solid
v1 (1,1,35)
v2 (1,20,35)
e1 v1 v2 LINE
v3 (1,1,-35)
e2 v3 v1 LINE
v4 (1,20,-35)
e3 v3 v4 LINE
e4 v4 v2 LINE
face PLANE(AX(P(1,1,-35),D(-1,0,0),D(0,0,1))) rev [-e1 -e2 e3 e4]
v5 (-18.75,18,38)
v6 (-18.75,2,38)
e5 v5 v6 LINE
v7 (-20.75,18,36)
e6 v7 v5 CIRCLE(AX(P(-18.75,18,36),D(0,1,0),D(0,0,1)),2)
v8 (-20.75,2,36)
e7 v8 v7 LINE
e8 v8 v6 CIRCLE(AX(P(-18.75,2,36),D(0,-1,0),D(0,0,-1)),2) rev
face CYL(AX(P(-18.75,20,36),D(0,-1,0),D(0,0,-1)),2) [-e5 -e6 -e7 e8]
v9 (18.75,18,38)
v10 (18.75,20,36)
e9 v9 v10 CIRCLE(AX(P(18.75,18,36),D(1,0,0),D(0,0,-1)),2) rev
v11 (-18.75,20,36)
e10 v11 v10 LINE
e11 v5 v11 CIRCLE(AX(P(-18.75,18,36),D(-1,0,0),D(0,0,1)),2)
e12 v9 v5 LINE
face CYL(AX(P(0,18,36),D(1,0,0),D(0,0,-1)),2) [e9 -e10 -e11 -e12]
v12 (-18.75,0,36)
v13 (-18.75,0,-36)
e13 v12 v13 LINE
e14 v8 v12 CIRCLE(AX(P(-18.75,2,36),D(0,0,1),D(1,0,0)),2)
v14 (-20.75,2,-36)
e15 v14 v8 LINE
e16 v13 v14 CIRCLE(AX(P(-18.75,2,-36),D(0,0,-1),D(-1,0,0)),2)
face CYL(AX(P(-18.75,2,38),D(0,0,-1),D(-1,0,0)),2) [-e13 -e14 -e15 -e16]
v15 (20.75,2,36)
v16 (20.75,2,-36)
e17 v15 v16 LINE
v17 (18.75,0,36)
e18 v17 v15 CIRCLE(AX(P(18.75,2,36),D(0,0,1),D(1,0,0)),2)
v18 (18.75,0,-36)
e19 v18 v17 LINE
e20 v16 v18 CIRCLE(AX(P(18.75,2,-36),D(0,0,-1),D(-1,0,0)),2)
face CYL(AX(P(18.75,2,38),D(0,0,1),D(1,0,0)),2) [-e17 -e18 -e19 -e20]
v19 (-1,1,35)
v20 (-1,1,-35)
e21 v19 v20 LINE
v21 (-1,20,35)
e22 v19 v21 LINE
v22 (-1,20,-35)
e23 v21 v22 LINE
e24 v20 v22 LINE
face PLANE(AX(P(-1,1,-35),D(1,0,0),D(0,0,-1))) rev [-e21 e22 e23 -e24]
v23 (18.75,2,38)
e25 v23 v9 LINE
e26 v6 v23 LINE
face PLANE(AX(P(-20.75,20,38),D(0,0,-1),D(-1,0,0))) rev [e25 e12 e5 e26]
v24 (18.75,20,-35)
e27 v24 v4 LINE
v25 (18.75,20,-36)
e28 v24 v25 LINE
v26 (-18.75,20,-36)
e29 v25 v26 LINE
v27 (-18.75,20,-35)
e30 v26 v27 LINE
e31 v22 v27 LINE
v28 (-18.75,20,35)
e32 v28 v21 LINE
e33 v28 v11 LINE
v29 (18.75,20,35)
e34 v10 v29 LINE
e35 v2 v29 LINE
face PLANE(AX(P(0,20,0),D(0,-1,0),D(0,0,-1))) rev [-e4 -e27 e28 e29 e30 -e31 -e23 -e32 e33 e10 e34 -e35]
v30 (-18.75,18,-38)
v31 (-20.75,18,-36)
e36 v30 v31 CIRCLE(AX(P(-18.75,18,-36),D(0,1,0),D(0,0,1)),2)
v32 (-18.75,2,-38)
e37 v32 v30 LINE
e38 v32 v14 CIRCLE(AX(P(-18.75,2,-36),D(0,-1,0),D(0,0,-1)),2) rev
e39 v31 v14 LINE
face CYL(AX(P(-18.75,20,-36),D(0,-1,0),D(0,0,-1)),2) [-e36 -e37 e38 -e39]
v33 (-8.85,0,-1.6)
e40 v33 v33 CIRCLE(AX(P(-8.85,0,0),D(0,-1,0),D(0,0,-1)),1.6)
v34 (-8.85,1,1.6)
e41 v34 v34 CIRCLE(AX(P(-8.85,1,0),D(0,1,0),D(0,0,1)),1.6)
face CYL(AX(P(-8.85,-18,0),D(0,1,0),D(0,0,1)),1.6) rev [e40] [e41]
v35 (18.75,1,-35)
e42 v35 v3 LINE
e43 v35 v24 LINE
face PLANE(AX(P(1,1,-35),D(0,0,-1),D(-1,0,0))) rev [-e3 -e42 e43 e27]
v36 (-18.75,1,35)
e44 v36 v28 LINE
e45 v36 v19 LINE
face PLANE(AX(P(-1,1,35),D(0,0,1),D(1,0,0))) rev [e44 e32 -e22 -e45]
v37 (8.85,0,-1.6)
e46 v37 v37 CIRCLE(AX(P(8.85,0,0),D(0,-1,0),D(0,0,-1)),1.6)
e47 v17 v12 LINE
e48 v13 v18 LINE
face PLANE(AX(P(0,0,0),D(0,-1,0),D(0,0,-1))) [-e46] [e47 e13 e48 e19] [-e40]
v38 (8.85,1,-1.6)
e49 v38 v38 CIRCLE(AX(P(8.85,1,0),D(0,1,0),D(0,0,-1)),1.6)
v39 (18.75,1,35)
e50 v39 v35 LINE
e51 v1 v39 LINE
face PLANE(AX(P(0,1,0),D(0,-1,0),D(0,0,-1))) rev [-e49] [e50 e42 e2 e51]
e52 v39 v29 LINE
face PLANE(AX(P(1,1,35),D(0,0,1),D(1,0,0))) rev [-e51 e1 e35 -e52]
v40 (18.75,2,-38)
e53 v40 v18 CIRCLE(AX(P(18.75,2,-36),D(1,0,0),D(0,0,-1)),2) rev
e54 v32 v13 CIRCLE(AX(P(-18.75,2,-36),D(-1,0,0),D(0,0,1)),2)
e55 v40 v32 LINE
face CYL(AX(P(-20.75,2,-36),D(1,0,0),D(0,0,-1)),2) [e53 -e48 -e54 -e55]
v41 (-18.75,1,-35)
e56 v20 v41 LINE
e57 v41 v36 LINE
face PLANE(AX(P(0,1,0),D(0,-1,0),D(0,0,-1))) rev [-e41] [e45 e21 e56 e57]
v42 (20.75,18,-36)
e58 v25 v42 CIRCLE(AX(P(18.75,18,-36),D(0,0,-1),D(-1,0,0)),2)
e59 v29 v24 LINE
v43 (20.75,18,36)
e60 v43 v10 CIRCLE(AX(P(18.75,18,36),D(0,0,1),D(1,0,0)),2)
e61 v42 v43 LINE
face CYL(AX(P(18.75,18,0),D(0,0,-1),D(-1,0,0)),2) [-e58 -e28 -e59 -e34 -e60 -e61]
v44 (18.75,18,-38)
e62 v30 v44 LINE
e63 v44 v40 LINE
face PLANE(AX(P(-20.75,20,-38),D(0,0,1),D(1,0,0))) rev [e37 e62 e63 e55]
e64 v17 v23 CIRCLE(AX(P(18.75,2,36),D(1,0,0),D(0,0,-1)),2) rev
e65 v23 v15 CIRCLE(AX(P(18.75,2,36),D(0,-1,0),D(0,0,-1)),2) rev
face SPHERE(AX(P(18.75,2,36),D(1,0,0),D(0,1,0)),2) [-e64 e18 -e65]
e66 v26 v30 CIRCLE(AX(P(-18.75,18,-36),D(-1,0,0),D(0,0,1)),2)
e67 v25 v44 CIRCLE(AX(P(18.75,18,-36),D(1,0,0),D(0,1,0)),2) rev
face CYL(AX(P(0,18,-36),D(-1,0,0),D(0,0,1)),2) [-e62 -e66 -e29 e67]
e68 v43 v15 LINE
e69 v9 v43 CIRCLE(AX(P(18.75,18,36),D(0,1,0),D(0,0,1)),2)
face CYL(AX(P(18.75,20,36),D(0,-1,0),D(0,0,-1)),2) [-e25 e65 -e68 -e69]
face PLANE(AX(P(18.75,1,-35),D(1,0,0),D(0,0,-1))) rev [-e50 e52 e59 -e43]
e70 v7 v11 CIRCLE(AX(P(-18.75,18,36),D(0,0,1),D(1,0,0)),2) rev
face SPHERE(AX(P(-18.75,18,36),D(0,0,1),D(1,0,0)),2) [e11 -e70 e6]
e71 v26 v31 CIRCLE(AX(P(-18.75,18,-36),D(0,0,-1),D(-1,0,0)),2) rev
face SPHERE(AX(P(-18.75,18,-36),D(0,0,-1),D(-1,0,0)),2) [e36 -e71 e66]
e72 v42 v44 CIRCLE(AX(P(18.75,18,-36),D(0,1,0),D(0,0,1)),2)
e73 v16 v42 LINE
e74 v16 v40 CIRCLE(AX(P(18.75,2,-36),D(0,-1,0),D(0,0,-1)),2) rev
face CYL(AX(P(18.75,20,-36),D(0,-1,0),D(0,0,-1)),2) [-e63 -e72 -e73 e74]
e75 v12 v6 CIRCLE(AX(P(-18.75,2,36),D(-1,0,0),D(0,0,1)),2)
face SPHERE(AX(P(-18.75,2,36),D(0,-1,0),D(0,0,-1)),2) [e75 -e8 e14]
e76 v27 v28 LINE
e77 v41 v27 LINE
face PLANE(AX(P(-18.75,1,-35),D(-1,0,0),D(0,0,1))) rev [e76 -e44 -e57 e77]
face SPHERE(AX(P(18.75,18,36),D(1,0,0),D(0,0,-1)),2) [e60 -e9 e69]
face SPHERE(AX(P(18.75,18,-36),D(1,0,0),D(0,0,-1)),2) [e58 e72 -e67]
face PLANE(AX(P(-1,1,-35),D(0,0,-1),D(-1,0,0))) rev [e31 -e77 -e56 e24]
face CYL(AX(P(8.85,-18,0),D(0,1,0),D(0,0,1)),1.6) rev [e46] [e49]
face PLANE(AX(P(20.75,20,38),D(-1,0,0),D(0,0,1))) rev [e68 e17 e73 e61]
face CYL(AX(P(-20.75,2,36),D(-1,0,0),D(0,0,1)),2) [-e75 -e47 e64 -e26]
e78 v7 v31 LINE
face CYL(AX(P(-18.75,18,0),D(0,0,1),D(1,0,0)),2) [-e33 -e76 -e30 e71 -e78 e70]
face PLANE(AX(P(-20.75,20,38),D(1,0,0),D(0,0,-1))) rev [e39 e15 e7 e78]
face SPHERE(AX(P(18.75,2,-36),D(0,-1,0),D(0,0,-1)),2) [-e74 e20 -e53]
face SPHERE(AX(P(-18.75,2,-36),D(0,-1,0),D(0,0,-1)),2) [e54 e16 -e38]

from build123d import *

# Parameters (mm, degrees)
SKETCH_1_W          = 41.5
SKETCH_1_H          = 76
EXTRUDE_1_DEPTH     = 20
SKETCH_2_W          = 17.75
SKETCH_2_H          = 70
CUT_EXTRUDE_1_DEPTH = 19
SKETCH_3_R          = 1.6
CUT_EXTRUDE_2_DEPTH = 19
FILLET_1_R          = 2


with BuildPart() as part:
    # 草图1 → 凸台-拉伸1 (new body)
    with BuildSketch(Plane(origin=(0, 0, 0), x_dir=(1, 0, 0), z_dir=(0, 1, 0))):
        Rectangle(SKETCH_1_W, SKETCH_1_H)
    extrude(amount=EXTRUDE_1_DEPTH)

    # 草图2 → 切除-拉伸1 (cut)
    with BuildSketch(Plane(origin=(0, 20, 0), x_dir=(1, 0, 0), z_dir=(0, 1, 0))):
        with Locations((-9.875, 0)):
            Rectangle(SKETCH_2_W, SKETCH_2_H)
        with Locations((9.875, 0)):
            Rectangle(SKETCH_2_W, SKETCH_2_H)
    extrude(amount=-CUT_EXTRUDE_1_DEPTH, mode=Mode.SUBTRACT)

    # 草图3 → 切除-拉伸2 (cut)
    with BuildSketch(Plane(origin=(0, 1, 0), x_dir=(1, 0, 0), z_dir=(0, 1, 0))):
        with Locations(Location((-8.85, 0, 0), (0, 0, 270))):
            Circle(SKETCH_3_R)
        with Locations(Location((8.85, 0, 0), (0, 0, 90))):
            Circle(SKETCH_3_R)
    extrude(amount=-CUT_EXTRUDE_2_DEPTH, mode=Mode.SUBTRACT)

    # 圆角1
    fillet_1_edges = [part.edges().sort_by_distance(p)[0] for p in [
        (-20.75, 20, 0),
        (0, 20, 38),
        (20.75, 20, 0),
        (0, 0, 38),
        (-20.75, 0, 0),
        (0, 0, -38),
        (20.75, 0, 0),
        (20.75, 10, 38),
        (-20.75, 10, 38),
        (-20.75, 10, -38),
        (20.75, 10, -38),
        (0, 20, -38),
    ]]
    fillet(fillet_1_edges, radius=FILLET_1_R - 0.0001)  # a hair under: the kernel refuses the full size


solid = part.part
